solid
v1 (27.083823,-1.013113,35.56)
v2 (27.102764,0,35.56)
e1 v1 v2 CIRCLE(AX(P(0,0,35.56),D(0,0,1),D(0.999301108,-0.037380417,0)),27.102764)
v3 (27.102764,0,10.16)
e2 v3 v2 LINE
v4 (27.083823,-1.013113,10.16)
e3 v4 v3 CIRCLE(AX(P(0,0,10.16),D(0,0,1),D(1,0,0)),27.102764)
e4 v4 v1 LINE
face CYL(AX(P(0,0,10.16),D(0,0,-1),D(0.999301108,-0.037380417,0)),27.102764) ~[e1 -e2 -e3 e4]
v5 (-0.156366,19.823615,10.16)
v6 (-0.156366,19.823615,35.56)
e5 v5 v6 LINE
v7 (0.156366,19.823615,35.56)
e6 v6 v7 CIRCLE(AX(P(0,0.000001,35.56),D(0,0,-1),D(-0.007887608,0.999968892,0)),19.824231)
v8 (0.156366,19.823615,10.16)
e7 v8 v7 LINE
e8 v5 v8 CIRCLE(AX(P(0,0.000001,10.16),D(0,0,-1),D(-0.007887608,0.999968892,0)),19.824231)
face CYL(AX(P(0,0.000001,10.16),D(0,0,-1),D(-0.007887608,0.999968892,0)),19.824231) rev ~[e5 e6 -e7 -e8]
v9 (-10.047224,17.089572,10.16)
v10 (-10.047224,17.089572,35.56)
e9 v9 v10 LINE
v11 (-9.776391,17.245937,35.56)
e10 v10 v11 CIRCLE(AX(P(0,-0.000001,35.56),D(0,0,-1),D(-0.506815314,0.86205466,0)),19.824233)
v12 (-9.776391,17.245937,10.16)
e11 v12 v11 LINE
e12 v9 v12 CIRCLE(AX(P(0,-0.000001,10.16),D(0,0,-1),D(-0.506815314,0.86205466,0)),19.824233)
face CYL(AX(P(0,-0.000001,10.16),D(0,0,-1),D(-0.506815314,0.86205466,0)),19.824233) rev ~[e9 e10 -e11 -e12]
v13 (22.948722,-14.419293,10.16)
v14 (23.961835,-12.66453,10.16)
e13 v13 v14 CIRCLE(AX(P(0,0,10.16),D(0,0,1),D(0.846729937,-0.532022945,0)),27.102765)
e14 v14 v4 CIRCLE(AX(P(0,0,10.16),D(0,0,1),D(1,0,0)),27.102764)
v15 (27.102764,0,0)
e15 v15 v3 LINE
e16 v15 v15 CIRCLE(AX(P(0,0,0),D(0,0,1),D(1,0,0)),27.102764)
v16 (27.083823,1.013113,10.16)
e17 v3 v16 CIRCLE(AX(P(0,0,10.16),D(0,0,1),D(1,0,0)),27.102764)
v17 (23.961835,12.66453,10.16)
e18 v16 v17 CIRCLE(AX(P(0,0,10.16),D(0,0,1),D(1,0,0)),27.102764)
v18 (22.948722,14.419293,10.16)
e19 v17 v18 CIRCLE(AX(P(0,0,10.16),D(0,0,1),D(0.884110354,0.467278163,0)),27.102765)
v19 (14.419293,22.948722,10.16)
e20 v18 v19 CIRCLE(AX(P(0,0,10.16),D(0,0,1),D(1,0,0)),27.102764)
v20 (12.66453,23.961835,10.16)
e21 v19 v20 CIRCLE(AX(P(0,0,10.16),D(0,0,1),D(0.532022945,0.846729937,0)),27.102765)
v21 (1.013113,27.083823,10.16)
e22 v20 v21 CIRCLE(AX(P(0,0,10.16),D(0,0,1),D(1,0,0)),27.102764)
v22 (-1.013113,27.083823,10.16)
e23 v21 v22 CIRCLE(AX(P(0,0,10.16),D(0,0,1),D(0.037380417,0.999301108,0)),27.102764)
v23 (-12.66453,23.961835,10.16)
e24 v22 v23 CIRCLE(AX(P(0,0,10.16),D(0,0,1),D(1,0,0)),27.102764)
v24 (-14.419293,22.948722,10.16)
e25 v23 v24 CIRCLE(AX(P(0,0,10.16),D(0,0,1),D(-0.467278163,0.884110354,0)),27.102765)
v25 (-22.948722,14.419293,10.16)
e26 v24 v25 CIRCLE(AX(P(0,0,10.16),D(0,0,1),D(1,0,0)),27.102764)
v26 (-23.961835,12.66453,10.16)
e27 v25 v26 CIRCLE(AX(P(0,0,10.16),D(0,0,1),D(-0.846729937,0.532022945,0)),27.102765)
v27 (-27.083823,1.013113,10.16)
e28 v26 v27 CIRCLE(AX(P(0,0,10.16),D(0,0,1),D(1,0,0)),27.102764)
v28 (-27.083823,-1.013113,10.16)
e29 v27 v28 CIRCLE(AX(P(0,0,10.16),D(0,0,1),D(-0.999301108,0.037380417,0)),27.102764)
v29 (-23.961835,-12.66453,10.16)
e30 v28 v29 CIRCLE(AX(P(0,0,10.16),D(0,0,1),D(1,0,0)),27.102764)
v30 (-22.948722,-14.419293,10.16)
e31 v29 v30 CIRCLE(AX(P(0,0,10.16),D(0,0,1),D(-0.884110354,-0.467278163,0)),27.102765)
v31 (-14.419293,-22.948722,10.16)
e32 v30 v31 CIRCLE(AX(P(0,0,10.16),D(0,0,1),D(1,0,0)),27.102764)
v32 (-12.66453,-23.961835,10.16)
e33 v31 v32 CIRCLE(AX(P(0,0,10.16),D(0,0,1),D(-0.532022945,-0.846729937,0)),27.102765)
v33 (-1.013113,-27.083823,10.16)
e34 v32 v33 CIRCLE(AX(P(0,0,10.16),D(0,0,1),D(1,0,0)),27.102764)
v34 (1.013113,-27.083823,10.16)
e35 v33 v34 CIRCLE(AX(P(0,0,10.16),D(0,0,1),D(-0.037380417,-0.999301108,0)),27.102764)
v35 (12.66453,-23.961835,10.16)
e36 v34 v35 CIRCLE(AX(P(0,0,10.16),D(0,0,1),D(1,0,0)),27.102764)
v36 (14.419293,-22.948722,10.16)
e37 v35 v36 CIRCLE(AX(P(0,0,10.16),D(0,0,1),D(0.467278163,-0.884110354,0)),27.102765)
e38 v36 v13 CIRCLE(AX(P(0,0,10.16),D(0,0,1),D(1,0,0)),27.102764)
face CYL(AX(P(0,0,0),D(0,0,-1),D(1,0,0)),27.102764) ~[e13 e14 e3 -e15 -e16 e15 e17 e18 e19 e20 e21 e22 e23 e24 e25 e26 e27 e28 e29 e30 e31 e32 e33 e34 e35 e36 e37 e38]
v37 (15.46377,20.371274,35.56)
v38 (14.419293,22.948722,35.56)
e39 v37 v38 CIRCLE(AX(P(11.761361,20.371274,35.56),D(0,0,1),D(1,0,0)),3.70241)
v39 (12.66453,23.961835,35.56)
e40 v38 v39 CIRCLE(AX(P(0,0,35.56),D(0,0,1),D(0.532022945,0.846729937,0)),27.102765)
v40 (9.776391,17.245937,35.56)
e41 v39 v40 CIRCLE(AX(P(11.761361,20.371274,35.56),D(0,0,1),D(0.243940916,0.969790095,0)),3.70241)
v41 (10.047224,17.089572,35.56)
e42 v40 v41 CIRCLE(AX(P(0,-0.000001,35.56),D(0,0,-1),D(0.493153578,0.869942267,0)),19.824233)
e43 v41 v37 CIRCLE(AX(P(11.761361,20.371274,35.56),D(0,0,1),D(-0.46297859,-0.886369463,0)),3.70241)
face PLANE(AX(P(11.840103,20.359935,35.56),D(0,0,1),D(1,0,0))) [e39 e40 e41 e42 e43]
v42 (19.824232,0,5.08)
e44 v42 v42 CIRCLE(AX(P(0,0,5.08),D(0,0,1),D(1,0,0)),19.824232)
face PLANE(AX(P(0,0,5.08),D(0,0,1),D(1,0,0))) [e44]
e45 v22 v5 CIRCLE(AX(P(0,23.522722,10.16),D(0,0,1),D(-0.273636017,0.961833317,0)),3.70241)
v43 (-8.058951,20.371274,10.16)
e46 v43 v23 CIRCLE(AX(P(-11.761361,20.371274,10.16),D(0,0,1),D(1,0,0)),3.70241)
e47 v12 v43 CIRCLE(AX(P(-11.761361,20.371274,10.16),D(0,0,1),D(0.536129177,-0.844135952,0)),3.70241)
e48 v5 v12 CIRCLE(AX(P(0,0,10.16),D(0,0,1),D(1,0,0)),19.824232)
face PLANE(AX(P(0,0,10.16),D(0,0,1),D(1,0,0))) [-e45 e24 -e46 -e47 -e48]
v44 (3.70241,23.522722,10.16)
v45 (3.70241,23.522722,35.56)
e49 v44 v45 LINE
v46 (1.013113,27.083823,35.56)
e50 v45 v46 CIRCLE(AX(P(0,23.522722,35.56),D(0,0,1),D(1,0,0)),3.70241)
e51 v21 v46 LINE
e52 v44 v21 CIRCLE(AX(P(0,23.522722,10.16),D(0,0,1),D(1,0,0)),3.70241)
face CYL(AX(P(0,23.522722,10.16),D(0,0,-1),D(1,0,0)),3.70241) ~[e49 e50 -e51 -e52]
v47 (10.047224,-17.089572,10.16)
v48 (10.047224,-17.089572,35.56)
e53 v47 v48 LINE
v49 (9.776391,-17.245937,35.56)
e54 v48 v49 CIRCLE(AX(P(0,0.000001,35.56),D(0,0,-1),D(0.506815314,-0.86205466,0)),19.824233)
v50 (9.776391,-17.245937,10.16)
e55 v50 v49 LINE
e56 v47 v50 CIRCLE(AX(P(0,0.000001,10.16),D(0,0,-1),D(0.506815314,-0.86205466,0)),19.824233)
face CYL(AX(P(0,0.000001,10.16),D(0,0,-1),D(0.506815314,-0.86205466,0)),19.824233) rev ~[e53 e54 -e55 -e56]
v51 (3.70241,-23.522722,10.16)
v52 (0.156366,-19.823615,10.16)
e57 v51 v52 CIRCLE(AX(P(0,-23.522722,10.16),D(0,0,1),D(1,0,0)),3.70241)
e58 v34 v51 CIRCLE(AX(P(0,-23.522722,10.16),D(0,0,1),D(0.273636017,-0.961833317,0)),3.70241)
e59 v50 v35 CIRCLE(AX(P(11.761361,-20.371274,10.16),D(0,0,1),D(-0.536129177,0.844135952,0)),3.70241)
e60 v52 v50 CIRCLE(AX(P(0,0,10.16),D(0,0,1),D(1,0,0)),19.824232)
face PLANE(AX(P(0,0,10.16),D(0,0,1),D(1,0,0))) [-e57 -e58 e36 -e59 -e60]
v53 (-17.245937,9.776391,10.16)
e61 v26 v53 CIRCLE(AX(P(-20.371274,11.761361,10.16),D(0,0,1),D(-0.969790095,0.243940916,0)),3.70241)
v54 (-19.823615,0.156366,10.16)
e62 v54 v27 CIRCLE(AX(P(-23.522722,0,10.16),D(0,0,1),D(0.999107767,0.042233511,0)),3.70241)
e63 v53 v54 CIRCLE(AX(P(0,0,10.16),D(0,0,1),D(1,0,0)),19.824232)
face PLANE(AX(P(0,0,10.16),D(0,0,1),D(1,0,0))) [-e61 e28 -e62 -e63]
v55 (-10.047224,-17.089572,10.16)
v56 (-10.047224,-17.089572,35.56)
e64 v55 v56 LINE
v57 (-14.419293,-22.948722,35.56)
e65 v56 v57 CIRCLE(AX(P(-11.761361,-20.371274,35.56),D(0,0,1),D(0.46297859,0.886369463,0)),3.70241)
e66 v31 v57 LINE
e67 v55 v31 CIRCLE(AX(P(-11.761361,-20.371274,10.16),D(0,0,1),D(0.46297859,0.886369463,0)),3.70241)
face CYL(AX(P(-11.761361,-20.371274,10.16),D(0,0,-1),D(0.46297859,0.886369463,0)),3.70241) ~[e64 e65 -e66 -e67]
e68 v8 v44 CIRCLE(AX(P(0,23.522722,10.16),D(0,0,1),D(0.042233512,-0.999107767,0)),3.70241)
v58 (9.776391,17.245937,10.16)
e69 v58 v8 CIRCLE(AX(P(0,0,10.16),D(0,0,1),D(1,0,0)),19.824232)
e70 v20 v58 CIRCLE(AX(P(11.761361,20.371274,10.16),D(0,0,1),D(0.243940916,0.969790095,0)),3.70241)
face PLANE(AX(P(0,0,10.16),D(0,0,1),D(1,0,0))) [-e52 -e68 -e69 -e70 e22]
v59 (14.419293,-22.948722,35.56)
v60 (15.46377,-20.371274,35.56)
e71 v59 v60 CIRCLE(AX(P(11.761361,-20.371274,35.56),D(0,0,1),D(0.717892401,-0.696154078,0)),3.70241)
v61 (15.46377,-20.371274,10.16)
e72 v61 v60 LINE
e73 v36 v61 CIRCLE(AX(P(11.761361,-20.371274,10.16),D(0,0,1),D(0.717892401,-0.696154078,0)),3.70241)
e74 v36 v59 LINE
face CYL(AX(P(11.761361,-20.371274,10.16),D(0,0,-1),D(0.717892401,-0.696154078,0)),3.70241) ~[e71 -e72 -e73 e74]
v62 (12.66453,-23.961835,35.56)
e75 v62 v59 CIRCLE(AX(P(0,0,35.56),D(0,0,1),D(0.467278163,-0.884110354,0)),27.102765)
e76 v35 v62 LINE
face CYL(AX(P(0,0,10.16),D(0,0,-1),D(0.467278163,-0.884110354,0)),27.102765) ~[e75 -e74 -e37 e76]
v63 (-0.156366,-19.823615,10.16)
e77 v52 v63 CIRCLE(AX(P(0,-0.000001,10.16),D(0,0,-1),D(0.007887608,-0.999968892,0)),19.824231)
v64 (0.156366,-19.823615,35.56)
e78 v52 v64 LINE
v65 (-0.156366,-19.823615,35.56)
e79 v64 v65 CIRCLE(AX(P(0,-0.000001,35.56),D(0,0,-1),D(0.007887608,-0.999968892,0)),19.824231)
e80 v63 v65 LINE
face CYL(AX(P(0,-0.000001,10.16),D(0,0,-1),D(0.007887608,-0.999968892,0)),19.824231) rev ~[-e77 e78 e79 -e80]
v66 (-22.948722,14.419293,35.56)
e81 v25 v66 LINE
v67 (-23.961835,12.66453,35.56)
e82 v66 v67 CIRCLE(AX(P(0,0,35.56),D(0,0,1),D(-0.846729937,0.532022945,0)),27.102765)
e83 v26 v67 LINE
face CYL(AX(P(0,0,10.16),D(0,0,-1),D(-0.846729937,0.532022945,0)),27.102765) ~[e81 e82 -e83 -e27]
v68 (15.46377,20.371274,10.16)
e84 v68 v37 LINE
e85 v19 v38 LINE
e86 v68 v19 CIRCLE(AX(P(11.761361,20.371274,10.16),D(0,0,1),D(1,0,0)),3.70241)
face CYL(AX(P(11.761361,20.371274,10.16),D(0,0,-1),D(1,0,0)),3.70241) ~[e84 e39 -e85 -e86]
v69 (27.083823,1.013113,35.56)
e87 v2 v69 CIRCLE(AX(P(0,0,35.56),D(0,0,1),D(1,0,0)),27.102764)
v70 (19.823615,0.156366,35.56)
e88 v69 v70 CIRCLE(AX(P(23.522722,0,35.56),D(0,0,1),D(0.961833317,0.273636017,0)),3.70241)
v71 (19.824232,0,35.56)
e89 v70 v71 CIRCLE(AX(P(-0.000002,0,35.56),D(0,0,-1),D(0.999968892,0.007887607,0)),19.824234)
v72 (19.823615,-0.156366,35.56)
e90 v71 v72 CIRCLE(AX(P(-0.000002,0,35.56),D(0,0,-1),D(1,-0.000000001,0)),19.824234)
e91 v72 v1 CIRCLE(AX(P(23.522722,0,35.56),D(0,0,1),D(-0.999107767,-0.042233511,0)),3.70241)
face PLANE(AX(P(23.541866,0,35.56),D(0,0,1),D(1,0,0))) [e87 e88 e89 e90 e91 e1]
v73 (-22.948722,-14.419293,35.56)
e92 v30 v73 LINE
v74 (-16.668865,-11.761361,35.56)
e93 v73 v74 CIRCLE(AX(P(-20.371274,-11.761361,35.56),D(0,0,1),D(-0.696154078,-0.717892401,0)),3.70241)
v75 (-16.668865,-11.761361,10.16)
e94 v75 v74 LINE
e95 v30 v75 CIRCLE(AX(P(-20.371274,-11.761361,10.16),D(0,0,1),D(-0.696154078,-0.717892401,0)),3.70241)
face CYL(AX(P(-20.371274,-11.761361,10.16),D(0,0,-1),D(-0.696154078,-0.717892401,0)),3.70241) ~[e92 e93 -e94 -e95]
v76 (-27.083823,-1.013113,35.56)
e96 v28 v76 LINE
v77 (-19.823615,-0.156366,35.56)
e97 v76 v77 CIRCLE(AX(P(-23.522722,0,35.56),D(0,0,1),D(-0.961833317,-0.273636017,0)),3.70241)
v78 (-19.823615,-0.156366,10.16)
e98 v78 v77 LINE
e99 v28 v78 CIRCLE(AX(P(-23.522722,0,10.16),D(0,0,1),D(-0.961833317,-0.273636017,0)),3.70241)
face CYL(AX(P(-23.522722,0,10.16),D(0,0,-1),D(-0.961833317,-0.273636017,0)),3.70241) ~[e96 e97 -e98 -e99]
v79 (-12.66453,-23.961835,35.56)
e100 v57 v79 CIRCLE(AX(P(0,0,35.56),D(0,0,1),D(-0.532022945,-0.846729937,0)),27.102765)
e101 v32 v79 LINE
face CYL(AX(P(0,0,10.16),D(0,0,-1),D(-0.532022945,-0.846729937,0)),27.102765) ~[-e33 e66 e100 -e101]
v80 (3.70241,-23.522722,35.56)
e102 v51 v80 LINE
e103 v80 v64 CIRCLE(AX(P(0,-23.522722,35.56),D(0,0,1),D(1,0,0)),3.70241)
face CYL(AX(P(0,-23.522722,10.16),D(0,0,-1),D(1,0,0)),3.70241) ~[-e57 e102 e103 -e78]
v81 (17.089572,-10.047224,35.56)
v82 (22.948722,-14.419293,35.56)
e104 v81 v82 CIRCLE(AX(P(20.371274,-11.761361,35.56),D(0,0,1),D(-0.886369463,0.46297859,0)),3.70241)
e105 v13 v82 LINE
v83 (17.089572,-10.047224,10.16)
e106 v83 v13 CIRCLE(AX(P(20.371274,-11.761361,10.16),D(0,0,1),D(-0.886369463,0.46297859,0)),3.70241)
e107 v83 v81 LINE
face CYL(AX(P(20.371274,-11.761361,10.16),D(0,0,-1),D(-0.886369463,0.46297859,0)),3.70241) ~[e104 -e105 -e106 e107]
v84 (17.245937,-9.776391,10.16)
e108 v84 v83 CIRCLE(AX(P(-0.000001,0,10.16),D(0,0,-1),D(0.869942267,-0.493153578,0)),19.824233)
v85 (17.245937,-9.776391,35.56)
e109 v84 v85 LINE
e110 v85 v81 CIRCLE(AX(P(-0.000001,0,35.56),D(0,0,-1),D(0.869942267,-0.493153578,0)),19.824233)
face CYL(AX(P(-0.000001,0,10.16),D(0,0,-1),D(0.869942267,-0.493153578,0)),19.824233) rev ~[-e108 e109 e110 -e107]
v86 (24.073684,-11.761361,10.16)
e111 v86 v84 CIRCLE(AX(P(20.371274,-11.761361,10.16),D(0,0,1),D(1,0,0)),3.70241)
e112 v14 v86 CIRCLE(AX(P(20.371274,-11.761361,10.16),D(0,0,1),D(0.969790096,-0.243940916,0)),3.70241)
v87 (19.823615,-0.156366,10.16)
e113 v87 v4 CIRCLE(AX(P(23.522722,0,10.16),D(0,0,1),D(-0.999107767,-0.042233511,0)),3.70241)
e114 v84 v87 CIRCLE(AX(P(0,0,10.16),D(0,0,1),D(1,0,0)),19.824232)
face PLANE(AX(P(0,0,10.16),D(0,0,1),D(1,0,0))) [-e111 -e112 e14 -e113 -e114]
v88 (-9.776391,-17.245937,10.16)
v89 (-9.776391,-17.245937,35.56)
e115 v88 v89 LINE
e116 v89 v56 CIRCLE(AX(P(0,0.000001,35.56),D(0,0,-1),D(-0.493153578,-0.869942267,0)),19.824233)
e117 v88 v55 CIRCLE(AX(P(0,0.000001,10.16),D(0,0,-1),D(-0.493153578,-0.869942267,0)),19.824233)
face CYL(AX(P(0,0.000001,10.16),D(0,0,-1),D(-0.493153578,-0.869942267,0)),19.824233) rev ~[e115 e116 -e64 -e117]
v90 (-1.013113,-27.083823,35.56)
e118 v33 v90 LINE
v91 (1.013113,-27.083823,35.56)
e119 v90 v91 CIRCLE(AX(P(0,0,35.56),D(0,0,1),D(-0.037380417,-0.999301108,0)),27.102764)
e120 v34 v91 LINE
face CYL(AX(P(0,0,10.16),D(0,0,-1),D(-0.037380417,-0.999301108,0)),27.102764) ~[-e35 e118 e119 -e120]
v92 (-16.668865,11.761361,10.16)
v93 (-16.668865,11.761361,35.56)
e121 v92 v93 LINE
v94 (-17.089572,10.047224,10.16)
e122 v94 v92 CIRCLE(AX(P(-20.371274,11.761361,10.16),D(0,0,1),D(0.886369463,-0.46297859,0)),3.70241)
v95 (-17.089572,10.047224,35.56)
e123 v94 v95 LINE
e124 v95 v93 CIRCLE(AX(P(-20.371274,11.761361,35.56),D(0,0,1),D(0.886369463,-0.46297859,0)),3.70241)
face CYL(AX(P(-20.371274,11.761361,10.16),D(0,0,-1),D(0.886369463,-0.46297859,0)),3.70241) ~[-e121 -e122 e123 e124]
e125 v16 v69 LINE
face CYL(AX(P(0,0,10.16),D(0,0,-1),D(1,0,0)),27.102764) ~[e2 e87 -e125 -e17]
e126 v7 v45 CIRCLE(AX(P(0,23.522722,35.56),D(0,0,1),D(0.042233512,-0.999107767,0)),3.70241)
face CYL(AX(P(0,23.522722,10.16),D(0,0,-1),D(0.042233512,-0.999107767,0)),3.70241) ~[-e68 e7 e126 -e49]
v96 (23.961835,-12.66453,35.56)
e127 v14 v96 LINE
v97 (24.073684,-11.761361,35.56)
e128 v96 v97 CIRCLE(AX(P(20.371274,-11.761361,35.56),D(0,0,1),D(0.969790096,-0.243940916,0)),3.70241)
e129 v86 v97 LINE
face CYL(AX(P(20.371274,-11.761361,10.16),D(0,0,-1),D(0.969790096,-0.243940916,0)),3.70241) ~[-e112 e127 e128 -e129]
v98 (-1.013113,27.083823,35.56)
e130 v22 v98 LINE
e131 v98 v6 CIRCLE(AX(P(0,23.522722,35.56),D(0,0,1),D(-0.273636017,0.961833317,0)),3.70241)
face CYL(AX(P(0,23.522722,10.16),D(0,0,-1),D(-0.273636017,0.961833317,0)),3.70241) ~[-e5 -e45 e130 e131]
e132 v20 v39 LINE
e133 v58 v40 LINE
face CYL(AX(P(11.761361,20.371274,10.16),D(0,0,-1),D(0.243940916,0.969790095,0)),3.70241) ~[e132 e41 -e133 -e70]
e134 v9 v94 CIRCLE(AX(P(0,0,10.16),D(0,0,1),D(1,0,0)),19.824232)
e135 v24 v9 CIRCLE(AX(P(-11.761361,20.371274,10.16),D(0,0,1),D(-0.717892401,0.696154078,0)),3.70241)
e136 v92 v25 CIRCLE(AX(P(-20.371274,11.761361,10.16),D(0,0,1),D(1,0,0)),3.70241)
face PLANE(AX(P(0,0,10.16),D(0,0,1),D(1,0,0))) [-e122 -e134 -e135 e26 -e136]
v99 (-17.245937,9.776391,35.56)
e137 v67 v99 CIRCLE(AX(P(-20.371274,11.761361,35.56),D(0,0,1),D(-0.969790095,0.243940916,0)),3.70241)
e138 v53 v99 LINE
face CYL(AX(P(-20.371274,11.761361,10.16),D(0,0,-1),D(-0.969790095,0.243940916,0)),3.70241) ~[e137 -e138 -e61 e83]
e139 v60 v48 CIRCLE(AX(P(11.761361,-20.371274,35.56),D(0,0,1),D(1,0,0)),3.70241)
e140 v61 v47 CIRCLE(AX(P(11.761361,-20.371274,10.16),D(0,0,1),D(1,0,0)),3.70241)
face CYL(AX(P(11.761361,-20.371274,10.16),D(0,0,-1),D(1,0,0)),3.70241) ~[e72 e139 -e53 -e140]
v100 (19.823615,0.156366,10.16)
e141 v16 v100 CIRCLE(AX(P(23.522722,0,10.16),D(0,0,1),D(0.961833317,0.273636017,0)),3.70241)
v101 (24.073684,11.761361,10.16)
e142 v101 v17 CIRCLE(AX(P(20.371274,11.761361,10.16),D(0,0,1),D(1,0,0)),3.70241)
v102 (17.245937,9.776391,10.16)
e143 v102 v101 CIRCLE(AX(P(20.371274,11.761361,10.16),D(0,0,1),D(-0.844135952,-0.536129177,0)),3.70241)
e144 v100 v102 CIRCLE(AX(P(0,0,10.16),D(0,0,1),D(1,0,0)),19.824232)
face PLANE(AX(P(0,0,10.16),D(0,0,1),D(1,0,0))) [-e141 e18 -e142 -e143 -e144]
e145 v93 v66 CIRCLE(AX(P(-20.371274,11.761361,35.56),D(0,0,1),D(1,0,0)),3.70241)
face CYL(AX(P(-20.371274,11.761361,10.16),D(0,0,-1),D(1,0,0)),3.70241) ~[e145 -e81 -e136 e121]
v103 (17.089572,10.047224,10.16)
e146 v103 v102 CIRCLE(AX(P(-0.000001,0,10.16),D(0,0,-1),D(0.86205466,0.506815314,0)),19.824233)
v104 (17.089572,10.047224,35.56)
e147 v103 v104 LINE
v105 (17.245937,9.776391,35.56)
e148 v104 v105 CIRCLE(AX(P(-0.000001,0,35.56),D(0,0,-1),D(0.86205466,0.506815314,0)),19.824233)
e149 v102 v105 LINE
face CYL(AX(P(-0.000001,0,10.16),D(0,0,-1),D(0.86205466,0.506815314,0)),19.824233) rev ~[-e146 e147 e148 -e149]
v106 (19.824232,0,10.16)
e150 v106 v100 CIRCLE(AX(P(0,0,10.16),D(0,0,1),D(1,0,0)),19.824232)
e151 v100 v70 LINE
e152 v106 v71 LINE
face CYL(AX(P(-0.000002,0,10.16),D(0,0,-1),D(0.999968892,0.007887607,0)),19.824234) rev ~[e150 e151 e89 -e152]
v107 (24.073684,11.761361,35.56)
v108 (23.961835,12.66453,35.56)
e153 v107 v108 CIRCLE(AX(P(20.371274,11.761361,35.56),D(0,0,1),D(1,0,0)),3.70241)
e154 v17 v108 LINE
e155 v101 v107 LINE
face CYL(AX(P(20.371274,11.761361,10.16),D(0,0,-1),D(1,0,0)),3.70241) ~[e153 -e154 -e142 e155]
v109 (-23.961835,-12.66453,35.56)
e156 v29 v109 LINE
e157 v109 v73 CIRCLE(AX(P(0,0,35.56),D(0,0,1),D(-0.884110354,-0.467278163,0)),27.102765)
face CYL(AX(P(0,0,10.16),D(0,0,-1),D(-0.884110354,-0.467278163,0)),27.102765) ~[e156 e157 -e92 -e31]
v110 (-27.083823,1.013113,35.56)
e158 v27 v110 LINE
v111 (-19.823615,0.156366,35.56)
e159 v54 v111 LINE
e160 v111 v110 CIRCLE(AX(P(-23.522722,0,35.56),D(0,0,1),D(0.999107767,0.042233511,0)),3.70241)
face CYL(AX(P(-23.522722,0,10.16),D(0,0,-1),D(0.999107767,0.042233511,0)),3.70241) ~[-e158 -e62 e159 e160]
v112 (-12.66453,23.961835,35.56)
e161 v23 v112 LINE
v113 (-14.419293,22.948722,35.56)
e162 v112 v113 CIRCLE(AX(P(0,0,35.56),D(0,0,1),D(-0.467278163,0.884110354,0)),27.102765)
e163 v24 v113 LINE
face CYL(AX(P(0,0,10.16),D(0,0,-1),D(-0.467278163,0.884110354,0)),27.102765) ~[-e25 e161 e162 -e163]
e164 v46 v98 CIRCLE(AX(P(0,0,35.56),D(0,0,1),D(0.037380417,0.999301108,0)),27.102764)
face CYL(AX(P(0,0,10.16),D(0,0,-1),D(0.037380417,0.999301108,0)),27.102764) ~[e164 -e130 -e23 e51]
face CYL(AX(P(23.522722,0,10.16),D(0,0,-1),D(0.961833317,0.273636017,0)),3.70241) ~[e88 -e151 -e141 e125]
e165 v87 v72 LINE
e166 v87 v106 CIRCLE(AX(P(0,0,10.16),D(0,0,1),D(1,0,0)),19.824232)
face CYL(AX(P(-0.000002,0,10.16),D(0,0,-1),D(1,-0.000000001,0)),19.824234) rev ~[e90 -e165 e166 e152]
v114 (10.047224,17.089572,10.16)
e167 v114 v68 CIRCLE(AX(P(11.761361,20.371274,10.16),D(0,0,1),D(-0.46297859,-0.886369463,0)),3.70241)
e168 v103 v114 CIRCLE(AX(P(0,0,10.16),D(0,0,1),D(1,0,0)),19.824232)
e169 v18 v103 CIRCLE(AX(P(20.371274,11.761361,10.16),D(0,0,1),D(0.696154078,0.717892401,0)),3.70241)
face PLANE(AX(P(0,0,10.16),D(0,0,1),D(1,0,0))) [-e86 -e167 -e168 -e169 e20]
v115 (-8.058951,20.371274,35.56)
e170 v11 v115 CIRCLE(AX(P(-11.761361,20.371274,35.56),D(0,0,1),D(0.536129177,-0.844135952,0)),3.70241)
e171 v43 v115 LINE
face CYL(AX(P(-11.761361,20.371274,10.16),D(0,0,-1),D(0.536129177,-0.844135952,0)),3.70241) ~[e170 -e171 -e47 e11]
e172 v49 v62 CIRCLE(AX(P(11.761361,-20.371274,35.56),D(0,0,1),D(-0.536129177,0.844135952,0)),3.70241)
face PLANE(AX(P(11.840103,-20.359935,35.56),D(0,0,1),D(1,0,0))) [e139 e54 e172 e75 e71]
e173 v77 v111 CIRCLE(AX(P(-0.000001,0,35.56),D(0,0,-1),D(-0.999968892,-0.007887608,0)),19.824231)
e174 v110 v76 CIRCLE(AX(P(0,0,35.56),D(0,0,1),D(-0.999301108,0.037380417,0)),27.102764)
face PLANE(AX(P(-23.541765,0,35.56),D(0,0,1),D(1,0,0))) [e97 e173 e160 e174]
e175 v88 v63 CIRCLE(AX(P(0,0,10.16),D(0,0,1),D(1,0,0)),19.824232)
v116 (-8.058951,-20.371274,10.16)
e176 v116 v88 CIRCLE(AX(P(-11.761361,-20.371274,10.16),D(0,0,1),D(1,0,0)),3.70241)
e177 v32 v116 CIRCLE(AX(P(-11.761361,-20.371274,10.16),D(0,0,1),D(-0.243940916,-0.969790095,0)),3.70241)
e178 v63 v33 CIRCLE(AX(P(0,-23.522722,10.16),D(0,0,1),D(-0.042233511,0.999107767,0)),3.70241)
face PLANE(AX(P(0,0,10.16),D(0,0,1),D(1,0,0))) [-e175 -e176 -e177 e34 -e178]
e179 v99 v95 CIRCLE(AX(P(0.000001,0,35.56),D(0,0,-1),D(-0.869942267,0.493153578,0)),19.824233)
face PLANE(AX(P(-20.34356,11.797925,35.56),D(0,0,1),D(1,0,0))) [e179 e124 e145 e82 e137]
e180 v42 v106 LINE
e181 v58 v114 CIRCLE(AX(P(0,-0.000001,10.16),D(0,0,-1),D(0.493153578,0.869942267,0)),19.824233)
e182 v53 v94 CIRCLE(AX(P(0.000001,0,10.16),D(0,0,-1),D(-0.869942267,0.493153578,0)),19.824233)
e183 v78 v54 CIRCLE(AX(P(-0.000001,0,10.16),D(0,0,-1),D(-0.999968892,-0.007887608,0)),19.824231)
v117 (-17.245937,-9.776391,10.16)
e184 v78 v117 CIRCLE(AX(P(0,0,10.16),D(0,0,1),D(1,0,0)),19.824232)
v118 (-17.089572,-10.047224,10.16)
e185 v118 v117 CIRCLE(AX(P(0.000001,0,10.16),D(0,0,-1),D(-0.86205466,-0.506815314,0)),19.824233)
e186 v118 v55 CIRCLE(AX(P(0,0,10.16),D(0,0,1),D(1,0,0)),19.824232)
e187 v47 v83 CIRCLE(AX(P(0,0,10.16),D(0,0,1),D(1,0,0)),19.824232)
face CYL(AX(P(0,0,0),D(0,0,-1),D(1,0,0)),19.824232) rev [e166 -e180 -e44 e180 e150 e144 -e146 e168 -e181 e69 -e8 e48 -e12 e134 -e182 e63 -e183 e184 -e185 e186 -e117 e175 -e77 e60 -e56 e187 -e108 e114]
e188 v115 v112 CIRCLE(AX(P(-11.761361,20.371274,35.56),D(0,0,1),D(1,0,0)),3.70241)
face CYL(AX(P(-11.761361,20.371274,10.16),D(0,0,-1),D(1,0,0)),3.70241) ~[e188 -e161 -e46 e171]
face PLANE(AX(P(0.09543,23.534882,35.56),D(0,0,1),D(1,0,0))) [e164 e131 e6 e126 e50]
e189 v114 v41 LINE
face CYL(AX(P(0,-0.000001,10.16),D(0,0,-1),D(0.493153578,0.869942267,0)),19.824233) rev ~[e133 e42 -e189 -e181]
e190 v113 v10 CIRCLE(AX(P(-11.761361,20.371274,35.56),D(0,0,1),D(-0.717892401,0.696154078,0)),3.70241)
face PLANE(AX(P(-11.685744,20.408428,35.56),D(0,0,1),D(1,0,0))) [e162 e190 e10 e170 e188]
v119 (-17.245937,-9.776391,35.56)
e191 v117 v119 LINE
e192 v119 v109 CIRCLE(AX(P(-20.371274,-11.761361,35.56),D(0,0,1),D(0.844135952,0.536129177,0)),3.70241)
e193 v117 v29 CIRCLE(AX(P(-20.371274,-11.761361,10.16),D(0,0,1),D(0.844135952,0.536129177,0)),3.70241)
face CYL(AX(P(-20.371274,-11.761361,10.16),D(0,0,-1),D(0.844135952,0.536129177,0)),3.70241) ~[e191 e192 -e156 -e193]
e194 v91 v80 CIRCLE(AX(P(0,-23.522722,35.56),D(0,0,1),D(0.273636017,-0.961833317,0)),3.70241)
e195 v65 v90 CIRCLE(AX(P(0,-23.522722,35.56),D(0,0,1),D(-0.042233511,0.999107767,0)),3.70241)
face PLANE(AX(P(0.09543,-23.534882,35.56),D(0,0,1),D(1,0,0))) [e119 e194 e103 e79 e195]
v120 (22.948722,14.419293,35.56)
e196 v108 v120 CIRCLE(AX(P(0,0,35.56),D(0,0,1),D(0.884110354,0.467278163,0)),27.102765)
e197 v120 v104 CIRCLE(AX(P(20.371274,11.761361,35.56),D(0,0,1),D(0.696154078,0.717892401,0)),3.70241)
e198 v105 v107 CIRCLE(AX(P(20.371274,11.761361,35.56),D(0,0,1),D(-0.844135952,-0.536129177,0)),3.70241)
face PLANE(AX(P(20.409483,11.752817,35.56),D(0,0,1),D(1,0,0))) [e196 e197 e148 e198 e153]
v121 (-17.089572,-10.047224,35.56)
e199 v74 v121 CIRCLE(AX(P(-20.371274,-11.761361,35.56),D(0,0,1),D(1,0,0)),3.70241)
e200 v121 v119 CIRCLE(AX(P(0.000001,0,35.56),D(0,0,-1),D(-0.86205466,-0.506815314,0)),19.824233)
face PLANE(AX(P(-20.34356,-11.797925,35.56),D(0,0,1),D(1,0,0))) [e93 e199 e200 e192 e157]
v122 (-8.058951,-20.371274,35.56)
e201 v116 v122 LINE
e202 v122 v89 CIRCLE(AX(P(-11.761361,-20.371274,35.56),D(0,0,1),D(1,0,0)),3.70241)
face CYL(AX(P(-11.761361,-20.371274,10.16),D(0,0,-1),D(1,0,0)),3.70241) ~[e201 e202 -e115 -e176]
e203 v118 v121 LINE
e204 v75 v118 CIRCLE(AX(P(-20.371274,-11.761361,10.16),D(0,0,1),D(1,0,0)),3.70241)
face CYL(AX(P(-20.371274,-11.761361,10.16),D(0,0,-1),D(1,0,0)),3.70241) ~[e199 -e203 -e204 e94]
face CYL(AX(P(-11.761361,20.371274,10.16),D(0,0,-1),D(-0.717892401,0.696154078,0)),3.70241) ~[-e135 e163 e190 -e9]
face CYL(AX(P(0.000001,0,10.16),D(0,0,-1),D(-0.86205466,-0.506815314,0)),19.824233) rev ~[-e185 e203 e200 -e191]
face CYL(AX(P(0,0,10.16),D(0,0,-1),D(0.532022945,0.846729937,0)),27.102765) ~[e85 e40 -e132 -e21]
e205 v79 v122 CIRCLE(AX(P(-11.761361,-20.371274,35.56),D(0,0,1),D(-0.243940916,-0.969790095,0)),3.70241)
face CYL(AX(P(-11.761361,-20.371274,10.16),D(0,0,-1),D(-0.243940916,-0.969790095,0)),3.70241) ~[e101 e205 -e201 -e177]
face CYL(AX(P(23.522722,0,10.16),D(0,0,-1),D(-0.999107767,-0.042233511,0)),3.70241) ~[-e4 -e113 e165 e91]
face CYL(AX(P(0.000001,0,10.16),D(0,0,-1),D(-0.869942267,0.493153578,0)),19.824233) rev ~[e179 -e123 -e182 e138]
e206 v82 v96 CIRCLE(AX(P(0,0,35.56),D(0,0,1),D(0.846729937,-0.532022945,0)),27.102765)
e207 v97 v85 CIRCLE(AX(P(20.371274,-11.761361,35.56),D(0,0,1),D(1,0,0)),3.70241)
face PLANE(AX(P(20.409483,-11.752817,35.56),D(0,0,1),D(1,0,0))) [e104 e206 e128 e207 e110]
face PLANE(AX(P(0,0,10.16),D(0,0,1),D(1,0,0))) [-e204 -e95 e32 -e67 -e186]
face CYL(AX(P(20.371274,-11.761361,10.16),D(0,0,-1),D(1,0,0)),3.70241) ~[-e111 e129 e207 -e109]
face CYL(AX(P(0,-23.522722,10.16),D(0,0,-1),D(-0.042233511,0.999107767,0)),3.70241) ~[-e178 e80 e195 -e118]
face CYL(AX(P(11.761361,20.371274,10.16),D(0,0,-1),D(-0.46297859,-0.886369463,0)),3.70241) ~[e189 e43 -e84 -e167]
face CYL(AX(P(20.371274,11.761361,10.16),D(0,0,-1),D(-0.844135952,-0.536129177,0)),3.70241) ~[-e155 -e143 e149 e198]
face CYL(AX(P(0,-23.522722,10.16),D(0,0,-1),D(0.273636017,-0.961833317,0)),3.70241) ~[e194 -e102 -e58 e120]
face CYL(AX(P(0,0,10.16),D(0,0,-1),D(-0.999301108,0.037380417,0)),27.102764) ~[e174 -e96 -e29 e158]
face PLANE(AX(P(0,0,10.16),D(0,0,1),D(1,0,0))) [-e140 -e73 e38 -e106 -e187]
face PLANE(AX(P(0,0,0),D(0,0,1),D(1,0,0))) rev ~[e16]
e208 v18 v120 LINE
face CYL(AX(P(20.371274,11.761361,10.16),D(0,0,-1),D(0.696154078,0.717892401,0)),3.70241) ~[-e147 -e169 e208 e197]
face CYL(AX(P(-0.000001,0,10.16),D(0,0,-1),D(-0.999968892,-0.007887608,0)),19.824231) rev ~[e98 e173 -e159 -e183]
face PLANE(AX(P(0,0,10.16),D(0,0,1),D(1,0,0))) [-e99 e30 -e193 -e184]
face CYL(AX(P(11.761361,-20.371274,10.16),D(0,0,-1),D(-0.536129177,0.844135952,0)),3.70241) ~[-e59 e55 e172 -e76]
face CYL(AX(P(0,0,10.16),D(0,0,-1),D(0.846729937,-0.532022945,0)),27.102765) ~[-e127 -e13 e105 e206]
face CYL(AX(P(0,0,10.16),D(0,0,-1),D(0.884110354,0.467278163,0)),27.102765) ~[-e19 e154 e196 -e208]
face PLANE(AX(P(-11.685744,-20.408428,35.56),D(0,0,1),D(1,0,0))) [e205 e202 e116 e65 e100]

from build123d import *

# Parameters (mm, degrees)
F0_R     = 19.8242320165
F1_DEPTH = 5.08
F0_R_2   = 27.1027644971
F2_DEPTH = 10.16
F4_DEPTH = 25.4


with BuildPart() as f1:
    # F0 (on Top) → F1 (new body)
    with BuildSketch(Plane.XY):
        Circle(F0_R)
    extrude(amount=F1_DEPTH)

    # F0 (on Top) → F2 (join)
    with BuildSketch(Plane.XY):
        Circle(F0_R_2)
        Circle(F0_R, mode=Mode.SUBTRACT)
    extrude(amount=F2_DEPTH)

    # F3 (on face) → F4 (join)
    with BuildSketch(Plane.XY.offset(10.16)):
        with BuildLine():
            ThreePointArc((27.1027644971, 0), (27.0980286069, 0.5066448501), (27.0838225914, 1.0131126398))
            ThreePointArc((27.0838225914, 1.0131126398), (23.0888262615, 3.676897102), (19.823615331, 0.1563657619))
            ThreePointArc((19.823615331, 0.1563657619), (19.8240778445, 0.078183489), (19.8242320165, 0))
            ThreePointArc((19.8242320165, 0), (19.8240778445, -0.078183489), (19.823615331, -0.1563657619))
            ThreePointArc((19.823615331, -0.1563657619), (23.0888262615, -3.676897102), (27.0838225914, -1.0131126398))
            ThreePointArc((27.0838225914, -1.0131126398), (27.0980286069, -0.5066448501), (27.1027644971, 0))
        make_face()
        with BuildLine():
            ThreePointArc((24.0736841586, 11.7613608018), (24.0456154002, 12.2163951196), (23.9618347156, 12.6645300128))
            ThreePointArc((23.9618347156, 12.6645300128), (23.4716825672, 13.5513822485), (22.9487220759, 14.4192925786))
            ThreePointArc((22.9487220759, 14.4192925786), (18.157061535, 14.7286994282), (17.0895715906, 10.0472243876))
            ThreePointArc((17.0895715906, 10.0472243876), (17.1682885368, 9.9121160082), (17.2459373524, 9.7763909435))
            ThreePointArc((17.2459373524, 9.7763909435), (21.404850558, 8.206145204), (24.0736841586, 11.7613608018))
        make_face()
        with BuildLine():
            ThreePointArc((22.9487220759, -14.4192925786), (23.4716825672, -13.5513822485), (23.9618347156, -12.6645300128))
            ThreePointArc((23.9618347156, -12.6645300128), (24.0456154002, -12.2163951196), (24.0736841586, -11.7613608018))
            ThreePointArc((24.0736841586, -11.7613608018), (21.404850558, -8.206145204), (17.2459373524, -9.7763909435))
            ThreePointArc((17.2459373524, -9.7763909435), (17.1682885368, -9.9121160082), (17.0895715906, -10.0472243876))
            ThreePointArc((17.0895715906, -10.0472243876), (18.157061535, -14.7286994282), (22.9487220759, -14.4192925786))
        make_face()
        with BuildLine():
            ThreePointArc((15.4637704856, 20.3712744748), (15.1927300486, 21.7617932839), (14.4192925786, 22.9487220759))
            ThreePointArc((14.4192925786, 22.9487220759), (13.5513822485, 23.4716825672), (12.6645300128, 23.9618347156))
            ThreePointArc((12.6645300128, 23.9618347156), (8.3601268333, 21.833958637), (9.7763909435, 17.2459373524))
            ThreePointArc((9.7763909435, 17.2459373524), (9.9121160082, 17.1682885368), (10.0472243876, 17.0895715906))
            ThreePointArc((10.0472243876, 17.0895715906), (13.6798761402, 17.2047090858), (15.4637704856, 20.3712744748))
        make_face()
        with BuildLine():
            ThreePointArc((12.6645300128, -23.9618347156), (13.5513822485, -23.4716825672), (14.4192925786, -22.9487220759))
            ThreePointArc((14.4192925786, -22.9487220759), (15.1927300486, -21.7617932839), (15.4637704856, -20.3712744748))
            ThreePointArc((15.4637704856, -20.3712744748), (13.6798761402, -17.2047090858), (10.0472243876, -17.0895715906))
            ThreePointArc((10.0472243876, -17.0895715906), (9.9121160082, -17.1682885368), (9.7763909435, -17.2459373524))
            ThreePointArc((9.7763909435, -17.2459373524), (8.3601268333, -21.833958637), (12.6645300128, -23.9618347156))
        make_face()
        with BuildLine():
            ThreePointArc((3.7024096838, 23.5227216035), (2.9545554247, 25.7539633451), (1.0131126398, 27.0838225914))
            ThreePointArc((1.0131126398, 27.0838225914), (0, 27.1027644971), (-1.0131126398, 27.0838225914))
            ThreePointArc((-1.0131126398, 27.0838225914), (-3.676897102, 23.0888262615), (-0.1563657619, 19.823615331))
            ThreePointArc((-0.1563657619, 19.823615331), (0, 19.8242320165), (0.1563657619, 19.823615331))
            ThreePointArc((0.1563657619, 19.823615331), (2.6727109437, 20.9606026215), (3.7024096838, 23.5227216035))
        make_face()
        with BuildLine():
            ThreePointArc((-1.0131126398, -27.0838225914), (0, -27.1027644971), (1.0131126398, -27.0838225914))
            ThreePointArc((1.0131126398, -27.0838225914), (2.9545554247, -25.7539633451), (3.7024096838, -23.5227216035))
            ThreePointArc((3.7024096838, -23.5227216035), (2.6727109437, -20.9606026215), (0.1563657619, -19.823615331))
            ThreePointArc((0.1563657619, -19.823615331), (0, -19.8242320165), (-0.1563657619, -19.823615331))
            ThreePointArc((-0.1563657619, -19.823615331), (-3.676897102, -23.0888262615), (-1.0131126398, -27.0838225914))
        make_face()
        with BuildLine():
            ThreePointArc((-8.0589511179, 20.3712744748), (-9.4849672688, 23.2911837114), (-12.6645300128, 23.9618347156))
            ThreePointArc((-12.6645300128, 23.9618347156), (-13.5513822485, 23.4716825672), (-14.4192925786, 22.9487220759))
            ThreePointArc((-14.4192925786, 22.9487220759), (-14.7286994282, 18.157061535), (-10.0472243876, 17.0895715906))
            ThreePointArc((-10.0472243876, 17.0895715906), (-9.9121160082, 17.1682885368), (-9.7763909435, 17.2459373524))
            ThreePointArc((-9.7763909435, 17.2459373524), (-8.5165950866, 18.5882060743), (-8.0589511179, 20.3712744748))
        make_face()
        with BuildLine():
            ThreePointArc((-14.4192925786, -22.9487220759), (-13.5513822485, -23.4716825672), (-12.6645300128, -23.9618347156))
            ThreePointArc((-12.6645300128, -23.9618347156), (-9.4849672688, -23.2911837114), (-8.0589511179, -20.3712744748))
            ThreePointArc((-8.0589511179, -20.3712744748), (-8.5165950866, -18.5882060743), (-9.7763909435, -17.2459373524))
            ThreePointArc((-9.7763909435, -17.2459373524), (-9.9121160082, -17.1682885368), (-10.0472243876, -17.0895715906))
            ThreePointArc((-10.0472243876, -17.0895715906), (-14.7286994282, -18.157061535), (-14.4192925786, -22.9487220759))
        make_face()
        with BuildLine():
            ThreePointArc((-16.668864791, 11.7613608018), (-18.9281752909, 15.1709505443), (-22.9487220759, 14.4192925786))
            ThreePointArc((-22.9487220759, 14.4192925786), (-23.4716825672, 13.5513822485), (-23.9618347156, 12.6645300128))
            ThreePointArc((-23.9618347156, 12.6645300128), (-21.833958637, 8.3601268333), (-17.2459373524, 9.7763909435))
            ThreePointArc((-17.2459373524, 9.7763909435), (-17.1682885368, 9.9121160082), (-17.0895715906, 10.0472243876))
            ThreePointArc((-17.0895715906, 10.0472243876), (-16.7755794095, 10.8788561477), (-16.668864791, 11.7613608018))
        make_face()
        with BuildLine():
            ThreePointArc((-23.9618347156, -12.6645300128), (-23.4716825672, -13.5513822485), (-22.9487220759, -14.4192925786))
            ThreePointArc((-22.9487220759, -14.4192925786), (-18.9281752909, -15.1709505443), (-16.668864791, -11.7613608018))
            ThreePointArc((-16.668864791, -11.7613608018), (-16.7755794095, -10.8788561477), (-17.0895715906, -10.0472243876))
            ThreePointArc((-17.0895715906, -10.0472243876), (-17.1682885368, -9.9121160082), (-17.2459373524, -9.7763909435))
            ThreePointArc((-17.2459373524, -9.7763909435), (-21.833958637, -8.3601268333), (-23.9618347156, -12.6645300128))
        make_face()
        with BuildLine():
            ThreePointArc((-19.823615331, 0.1563657619), (-23.0888262615, 3.676897102), (-27.0838225914, 1.0131126398))
            ThreePointArc((-27.0838225914, 1.0131126398), (-27.1027644971, 0), (-27.0838225914, -1.0131126398))
            ThreePointArc((-27.0838225914, -1.0131126398), (-23.0888262615, -3.676897102), (-19.823615331, -0.1563657619))
            ThreePointArc((-19.823615331, -0.1563657619), (-19.8242320165, 0), (-19.823615331, 0.1563657619))
        make_face()
    extrude(amount=F4_DEPTH)


solid = f1.part
